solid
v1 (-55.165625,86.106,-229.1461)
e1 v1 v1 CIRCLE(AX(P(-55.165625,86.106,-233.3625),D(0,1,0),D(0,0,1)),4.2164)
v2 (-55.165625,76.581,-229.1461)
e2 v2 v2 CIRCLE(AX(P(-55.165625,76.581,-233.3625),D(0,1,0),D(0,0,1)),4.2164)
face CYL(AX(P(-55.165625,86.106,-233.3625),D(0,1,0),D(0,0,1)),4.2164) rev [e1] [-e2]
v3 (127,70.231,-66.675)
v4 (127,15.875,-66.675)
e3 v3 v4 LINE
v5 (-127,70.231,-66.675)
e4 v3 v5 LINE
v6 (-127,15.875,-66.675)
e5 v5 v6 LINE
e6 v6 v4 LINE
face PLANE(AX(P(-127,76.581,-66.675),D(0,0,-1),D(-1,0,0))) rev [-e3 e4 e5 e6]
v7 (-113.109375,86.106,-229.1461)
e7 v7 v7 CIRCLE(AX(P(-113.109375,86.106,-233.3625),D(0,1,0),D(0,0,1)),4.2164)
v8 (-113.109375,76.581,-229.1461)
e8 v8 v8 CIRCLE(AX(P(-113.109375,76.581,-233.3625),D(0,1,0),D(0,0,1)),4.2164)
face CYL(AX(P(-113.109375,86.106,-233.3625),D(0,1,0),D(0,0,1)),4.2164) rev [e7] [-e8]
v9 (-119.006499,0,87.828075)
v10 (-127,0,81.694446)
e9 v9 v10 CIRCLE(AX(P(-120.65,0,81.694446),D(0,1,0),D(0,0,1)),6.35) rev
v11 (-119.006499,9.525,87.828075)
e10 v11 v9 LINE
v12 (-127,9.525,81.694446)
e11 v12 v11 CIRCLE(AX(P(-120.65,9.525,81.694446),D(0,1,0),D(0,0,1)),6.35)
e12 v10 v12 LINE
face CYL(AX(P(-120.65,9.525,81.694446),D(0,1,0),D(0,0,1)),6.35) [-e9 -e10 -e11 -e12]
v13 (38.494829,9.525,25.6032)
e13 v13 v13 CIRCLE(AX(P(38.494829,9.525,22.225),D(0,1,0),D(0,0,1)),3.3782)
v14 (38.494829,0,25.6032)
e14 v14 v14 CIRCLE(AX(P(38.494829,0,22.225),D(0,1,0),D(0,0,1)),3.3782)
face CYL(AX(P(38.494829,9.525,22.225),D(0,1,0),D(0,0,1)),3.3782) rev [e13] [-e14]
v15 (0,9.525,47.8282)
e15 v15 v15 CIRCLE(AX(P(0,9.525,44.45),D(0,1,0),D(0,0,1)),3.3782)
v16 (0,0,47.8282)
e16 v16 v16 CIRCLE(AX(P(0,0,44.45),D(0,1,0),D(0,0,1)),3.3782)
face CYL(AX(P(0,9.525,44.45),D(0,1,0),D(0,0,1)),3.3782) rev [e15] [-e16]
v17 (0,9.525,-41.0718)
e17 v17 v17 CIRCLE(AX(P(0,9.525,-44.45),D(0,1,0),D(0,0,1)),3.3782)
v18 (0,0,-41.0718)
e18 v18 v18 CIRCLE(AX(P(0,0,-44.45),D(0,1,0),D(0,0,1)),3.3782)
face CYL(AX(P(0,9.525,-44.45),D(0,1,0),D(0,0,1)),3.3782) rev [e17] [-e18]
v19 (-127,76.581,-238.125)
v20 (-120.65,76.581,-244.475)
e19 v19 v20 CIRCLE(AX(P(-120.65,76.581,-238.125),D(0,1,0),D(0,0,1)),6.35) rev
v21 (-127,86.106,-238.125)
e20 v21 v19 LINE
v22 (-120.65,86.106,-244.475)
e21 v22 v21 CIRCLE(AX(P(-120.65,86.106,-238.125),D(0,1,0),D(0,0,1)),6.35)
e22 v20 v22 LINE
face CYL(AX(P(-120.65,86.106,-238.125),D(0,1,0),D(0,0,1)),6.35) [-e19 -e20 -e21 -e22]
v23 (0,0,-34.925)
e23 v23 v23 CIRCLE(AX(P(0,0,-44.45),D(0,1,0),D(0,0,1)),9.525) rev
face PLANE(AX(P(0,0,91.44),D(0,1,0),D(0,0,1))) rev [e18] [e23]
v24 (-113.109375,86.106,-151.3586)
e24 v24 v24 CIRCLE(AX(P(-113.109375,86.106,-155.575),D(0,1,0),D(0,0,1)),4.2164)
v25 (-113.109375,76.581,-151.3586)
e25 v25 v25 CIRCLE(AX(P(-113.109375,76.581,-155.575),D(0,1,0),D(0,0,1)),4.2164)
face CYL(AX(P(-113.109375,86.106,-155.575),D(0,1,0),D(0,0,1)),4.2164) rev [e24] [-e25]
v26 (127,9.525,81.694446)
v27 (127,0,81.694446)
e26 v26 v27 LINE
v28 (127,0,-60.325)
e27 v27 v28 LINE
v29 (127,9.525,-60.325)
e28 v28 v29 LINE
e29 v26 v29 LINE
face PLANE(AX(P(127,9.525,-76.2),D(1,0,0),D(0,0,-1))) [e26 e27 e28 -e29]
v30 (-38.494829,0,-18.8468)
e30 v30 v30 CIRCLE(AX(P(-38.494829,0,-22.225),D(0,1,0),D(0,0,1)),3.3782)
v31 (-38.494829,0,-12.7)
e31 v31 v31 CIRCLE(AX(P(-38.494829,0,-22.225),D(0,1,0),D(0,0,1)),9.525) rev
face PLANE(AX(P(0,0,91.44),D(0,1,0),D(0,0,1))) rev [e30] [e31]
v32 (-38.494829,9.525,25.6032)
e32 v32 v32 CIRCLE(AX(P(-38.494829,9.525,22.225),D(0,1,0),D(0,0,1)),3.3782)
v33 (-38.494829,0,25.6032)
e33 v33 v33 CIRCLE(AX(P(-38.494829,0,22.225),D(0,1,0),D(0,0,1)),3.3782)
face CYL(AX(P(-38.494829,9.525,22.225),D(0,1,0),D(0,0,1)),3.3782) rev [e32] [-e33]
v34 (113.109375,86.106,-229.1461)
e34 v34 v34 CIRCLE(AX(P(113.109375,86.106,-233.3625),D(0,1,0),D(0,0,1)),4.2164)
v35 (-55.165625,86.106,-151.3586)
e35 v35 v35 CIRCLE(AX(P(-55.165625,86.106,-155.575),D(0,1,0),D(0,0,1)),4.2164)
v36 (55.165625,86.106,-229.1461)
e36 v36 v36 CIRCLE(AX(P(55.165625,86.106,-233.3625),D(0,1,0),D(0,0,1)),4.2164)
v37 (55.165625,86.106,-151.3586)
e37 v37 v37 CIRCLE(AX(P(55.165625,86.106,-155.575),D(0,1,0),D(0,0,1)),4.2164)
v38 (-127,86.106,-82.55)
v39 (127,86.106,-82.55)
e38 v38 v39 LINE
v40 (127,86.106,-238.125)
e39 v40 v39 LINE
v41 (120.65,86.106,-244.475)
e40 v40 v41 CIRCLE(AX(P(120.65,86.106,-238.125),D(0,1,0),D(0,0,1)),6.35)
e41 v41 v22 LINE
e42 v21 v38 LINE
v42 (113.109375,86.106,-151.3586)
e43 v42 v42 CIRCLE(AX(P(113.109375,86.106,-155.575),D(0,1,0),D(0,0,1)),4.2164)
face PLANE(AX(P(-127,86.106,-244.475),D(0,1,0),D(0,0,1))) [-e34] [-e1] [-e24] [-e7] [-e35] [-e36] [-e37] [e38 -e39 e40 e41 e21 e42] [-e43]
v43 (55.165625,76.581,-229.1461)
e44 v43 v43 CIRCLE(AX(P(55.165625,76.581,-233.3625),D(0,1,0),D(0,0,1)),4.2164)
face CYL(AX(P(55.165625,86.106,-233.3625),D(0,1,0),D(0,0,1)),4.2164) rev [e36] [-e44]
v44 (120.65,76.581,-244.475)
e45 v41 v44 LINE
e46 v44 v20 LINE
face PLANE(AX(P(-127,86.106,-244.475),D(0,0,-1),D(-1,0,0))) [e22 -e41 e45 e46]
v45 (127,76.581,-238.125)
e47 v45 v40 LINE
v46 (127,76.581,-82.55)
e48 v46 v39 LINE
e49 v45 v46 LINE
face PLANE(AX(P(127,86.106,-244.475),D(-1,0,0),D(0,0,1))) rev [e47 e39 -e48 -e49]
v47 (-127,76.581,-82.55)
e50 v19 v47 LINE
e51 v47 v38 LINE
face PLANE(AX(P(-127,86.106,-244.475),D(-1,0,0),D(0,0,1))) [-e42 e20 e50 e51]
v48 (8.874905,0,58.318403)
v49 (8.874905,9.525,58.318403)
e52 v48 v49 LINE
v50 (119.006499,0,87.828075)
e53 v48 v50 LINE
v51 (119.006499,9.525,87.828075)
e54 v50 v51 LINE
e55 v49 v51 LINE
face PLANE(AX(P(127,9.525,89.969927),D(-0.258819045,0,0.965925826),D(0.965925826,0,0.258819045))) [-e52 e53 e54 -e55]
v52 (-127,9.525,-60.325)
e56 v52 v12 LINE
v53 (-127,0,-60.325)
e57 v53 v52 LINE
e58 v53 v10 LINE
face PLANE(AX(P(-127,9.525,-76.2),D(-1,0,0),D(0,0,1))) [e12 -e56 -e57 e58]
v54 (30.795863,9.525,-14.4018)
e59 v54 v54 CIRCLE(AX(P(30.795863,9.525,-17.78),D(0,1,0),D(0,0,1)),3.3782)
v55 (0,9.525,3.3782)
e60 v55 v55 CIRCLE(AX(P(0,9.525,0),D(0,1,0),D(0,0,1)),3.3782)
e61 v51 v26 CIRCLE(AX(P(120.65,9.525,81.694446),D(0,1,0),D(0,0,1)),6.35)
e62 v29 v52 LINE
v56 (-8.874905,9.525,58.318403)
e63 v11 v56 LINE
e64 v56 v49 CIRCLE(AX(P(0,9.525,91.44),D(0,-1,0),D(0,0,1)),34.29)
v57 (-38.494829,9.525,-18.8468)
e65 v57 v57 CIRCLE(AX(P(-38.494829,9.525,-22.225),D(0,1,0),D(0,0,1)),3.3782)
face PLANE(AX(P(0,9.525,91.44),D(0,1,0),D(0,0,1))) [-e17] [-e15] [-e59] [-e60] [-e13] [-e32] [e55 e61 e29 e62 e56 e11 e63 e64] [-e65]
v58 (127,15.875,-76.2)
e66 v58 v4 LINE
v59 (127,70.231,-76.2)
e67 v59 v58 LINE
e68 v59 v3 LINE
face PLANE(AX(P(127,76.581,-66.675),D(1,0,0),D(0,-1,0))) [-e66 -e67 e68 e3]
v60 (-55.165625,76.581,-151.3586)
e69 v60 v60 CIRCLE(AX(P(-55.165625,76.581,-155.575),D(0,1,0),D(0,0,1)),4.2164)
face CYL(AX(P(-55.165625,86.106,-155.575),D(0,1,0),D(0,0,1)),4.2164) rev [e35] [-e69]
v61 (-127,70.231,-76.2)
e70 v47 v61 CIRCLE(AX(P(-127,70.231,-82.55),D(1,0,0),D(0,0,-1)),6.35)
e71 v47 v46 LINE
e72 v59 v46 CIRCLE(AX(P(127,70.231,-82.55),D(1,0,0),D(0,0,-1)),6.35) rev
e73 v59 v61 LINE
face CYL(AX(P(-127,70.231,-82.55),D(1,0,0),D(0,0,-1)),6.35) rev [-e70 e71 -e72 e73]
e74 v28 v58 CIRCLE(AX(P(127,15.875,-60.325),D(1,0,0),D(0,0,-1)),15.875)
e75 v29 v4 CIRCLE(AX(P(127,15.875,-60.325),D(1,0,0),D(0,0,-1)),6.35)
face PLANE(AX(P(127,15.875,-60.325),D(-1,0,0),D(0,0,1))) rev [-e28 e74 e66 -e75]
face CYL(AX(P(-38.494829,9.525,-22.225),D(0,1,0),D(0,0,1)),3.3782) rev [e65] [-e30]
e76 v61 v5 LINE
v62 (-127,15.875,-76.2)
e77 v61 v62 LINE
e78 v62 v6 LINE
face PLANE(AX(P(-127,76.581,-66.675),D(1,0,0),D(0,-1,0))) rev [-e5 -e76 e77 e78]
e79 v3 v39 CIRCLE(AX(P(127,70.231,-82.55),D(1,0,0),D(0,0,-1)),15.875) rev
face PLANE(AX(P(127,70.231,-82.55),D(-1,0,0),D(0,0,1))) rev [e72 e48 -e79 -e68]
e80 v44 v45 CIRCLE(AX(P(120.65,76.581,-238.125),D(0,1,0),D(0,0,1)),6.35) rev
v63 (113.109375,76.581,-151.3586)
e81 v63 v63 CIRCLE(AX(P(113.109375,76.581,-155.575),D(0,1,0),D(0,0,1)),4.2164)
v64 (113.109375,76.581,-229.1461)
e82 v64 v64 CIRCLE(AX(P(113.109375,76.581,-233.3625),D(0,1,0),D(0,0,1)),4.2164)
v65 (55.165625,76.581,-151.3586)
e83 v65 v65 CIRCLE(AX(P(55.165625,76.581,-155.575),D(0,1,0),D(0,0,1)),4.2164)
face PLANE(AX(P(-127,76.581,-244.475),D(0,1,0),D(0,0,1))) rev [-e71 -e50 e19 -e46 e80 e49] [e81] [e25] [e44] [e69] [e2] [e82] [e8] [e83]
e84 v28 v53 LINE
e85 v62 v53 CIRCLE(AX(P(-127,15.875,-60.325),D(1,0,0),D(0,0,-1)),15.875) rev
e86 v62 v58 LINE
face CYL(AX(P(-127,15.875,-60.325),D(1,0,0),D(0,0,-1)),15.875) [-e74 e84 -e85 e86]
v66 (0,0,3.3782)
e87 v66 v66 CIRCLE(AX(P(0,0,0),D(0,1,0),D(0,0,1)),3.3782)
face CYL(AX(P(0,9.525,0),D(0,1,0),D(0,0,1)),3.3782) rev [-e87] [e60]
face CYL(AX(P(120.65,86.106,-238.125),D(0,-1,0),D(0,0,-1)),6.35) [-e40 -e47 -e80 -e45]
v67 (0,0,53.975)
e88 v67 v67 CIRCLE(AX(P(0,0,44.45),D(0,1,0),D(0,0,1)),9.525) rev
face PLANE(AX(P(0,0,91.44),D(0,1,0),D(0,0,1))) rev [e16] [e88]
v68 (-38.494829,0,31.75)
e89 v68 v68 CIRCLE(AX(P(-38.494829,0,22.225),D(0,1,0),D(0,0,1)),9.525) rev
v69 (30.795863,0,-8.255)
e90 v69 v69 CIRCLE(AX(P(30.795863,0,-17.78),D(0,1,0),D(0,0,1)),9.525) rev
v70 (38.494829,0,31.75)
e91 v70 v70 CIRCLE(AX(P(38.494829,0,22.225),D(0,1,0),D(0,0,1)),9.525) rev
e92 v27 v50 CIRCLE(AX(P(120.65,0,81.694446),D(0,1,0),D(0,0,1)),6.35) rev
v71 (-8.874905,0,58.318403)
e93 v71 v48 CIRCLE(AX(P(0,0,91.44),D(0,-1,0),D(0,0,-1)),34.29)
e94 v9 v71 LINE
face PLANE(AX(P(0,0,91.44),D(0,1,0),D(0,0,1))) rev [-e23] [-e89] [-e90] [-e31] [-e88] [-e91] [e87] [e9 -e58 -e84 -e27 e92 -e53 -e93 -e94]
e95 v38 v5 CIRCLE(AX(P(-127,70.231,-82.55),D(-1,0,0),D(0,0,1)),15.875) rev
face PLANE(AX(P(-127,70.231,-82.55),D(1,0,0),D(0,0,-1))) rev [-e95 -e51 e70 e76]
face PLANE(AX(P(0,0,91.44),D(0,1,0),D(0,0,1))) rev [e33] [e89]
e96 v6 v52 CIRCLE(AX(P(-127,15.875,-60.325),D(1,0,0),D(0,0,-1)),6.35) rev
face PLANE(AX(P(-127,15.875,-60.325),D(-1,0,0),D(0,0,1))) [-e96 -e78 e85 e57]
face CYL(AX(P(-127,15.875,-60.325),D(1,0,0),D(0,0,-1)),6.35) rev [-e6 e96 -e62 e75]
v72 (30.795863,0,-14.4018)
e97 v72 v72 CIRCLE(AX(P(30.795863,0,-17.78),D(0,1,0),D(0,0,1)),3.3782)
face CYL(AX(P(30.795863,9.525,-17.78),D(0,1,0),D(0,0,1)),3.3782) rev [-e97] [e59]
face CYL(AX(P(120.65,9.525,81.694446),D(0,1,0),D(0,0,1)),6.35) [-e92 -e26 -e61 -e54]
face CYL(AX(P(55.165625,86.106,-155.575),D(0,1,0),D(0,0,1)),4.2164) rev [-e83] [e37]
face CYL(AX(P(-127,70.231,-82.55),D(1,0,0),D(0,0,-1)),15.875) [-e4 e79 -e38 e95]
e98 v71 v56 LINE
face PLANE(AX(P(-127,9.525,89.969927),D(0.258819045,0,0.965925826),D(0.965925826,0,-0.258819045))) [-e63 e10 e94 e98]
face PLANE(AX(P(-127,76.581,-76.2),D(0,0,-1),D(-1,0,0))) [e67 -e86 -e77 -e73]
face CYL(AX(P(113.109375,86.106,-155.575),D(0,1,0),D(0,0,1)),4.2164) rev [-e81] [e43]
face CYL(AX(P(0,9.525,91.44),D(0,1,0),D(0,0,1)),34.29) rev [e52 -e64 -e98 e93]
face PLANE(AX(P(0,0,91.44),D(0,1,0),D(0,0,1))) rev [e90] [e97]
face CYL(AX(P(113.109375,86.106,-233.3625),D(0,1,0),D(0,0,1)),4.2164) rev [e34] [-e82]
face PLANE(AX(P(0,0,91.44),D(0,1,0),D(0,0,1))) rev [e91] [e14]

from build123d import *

# Parameters (mm, degrees)
BOSS_EXTRUDE1_DEPTH      = 9.525
SKETCH2_W                = 254
SKETCH2_H                = 9.525
BOSS_EXTRUDE2_DEPTH      = 67.056
SKETCH3_W                = 254
SKETCH3_H                = 9.525
BOSS_EXTRUDE3_DEPTH      = 177.8
CONVERT_SOLID1_START     = -127
CONVERT_SOLID1_DEPTH     = 254
CONVERT_SOLID1_2_DEPTH   = 254
FILLET3_R                = 6.35
F_5_16_CLEARANCE_HOLE1_D = 8.4328
F_1_4_CLEARANCE_HOLE2_D  = 6.7564


# Read off the part's stored shape, not the designer's step: Convert-Solid1
with BuildPart() as part:
    # Sketch1 → Boss-Extrude1 (new body)
    with BuildSketch(Plane(origin=(0, 0, 0), x_dir=(1, 0, 0), z_dir=(0, 1, 0))):
        with BuildLine():
            Line((-127, 76.2), (127, 76.2))
            Line((127, 76.2), (127, -89.969927212))
            Line((127, -89.969927212), (8.874905057, -58.318403417))
            ThreePointArc((8.874905057, -58.318403417), (0, -57.15), (-8.874905057, -58.318403417))
            Line((-8.874905057, -58.318403417), (-127, -89.969927212))
            Line((-127, -89.969927212), (-127, 76.2))
        make_face()
    extrude(amount=BOSS_EXTRUDE1_DEPTH)

    # Sketch2 → Boss-Extrude2 (add)
    with BuildSketch(Plane(origin=(0, 9.525, 0), x_dir=(1, 0, 0), z_dir=(0, 1, 0))):
        with Locations((0, 71.4375)):
            Rectangle(SKETCH2_W, SKETCH2_H)
    extrude(amount=BOSS_EXTRUDE2_DEPTH)

    # Sketch3 → Boss-Extrude3 (add)
    with BuildSketch(Plane.XY.offset(-66.675)):
        with Locations((0, 81.3435)):
            Rectangle(SKETCH3_W, SKETCH3_H)
    extrude(amount=-BOSS_EXTRUDE3_DEPTH)

    # Convert-Solid1 outline → Convert-Solid1 (cut)
    with BuildSketch(Plane.YZ.offset(CONVERT_SOLID1_START)):
        with BuildLine():
            ThreePointArc((70.231, -66.675), (81.456320151, -71.324679849), (86.106, -82.55))
            Line((86.106, -82.55), (86.106, -66.675))
            Line((86.106, -66.675), (70.231, -66.675))
        make_face()
        with BuildLine():
            Line((0, -76.2), (15.875, -76.2))
            ThreePointArc((15.875, -76.2), (4.649679849, -71.550320151), (0, -60.325))
            Line((0, -60.325), (0, -76.2))
        make_face()
    extrude(amount=CONVERT_SOLID1_DEPTH, mode=Mode.SUBTRACT)

    # Convert-Solid1 2 outline → Convert-Solid1 2 (add)
    with BuildSketch(Plane.YZ.offset(CONVERT_SOLID1_START)):
        with BuildLine():
            Line((9.525, -66.675), (15.875, -66.675))
            ThreePointArc((15.875, -66.675), (11.384871939, -64.815128061), (9.525, -60.325))
            Line((9.525, -60.325), (9.525, -66.675))
        make_face()
        with BuildLine():
            ThreePointArc((70.231, -76.2), (74.721128061, -78.059871939), (76.581, -82.55))
            Line((76.581, -82.55), (76.581, -76.2))
            Line((76.581, -76.2), (70.231, -76.2))
        make_face()
    extrude(amount=CONVERT_SOLID1_2_DEPTH)

    # Fillet3
    fillet3_edges = [part.edges().sort_by_distance(p)[0] for p in [
        (127, 4.7625, 89.969927212),
        (-127, 4.7625, 89.969927212),
        (-127, 81.3435, -244.475),
        (127, 81.3435, -244.475),
    ]]
    fillet(fillet3_edges, radius=FILLET3_R)

    # 5/16 Clearance Hole1 (through all)
    with Locations(Plane(origin=(0, 86.106, 0), x_dir=(1, 0, 0), z_dir=(0, 1, 0))):
        with Locations((-113.109375, 233.3625), (-55.165625, 233.3625), (-55.165625, 155.575), (-113.109375, 155.575), (113.109375, 155.575), (55.165625, 155.575), (55.165625, 233.3625), (113.109375, 233.3625)):
            Hole(F_5_16_CLEARANCE_HOLE1_D / 2)

    # 1/4 Clearance Hole2 (through all)
    with Locations(Plane(origin=(0, 9.525, 0), x_dir=(1, 0, 0), z_dir=(0, 1, 0))):
        with Locations((0, 0), (0, 44.45), (30.795863359, 17.78), (38.494829198, -22.225), (0, -44.45), (-38.494829198, -22.225), (-38.494829198, 22.225)):
            Hole(F_1_4_CLEARANCE_HOLE2_D / 2)


solid = part.part
